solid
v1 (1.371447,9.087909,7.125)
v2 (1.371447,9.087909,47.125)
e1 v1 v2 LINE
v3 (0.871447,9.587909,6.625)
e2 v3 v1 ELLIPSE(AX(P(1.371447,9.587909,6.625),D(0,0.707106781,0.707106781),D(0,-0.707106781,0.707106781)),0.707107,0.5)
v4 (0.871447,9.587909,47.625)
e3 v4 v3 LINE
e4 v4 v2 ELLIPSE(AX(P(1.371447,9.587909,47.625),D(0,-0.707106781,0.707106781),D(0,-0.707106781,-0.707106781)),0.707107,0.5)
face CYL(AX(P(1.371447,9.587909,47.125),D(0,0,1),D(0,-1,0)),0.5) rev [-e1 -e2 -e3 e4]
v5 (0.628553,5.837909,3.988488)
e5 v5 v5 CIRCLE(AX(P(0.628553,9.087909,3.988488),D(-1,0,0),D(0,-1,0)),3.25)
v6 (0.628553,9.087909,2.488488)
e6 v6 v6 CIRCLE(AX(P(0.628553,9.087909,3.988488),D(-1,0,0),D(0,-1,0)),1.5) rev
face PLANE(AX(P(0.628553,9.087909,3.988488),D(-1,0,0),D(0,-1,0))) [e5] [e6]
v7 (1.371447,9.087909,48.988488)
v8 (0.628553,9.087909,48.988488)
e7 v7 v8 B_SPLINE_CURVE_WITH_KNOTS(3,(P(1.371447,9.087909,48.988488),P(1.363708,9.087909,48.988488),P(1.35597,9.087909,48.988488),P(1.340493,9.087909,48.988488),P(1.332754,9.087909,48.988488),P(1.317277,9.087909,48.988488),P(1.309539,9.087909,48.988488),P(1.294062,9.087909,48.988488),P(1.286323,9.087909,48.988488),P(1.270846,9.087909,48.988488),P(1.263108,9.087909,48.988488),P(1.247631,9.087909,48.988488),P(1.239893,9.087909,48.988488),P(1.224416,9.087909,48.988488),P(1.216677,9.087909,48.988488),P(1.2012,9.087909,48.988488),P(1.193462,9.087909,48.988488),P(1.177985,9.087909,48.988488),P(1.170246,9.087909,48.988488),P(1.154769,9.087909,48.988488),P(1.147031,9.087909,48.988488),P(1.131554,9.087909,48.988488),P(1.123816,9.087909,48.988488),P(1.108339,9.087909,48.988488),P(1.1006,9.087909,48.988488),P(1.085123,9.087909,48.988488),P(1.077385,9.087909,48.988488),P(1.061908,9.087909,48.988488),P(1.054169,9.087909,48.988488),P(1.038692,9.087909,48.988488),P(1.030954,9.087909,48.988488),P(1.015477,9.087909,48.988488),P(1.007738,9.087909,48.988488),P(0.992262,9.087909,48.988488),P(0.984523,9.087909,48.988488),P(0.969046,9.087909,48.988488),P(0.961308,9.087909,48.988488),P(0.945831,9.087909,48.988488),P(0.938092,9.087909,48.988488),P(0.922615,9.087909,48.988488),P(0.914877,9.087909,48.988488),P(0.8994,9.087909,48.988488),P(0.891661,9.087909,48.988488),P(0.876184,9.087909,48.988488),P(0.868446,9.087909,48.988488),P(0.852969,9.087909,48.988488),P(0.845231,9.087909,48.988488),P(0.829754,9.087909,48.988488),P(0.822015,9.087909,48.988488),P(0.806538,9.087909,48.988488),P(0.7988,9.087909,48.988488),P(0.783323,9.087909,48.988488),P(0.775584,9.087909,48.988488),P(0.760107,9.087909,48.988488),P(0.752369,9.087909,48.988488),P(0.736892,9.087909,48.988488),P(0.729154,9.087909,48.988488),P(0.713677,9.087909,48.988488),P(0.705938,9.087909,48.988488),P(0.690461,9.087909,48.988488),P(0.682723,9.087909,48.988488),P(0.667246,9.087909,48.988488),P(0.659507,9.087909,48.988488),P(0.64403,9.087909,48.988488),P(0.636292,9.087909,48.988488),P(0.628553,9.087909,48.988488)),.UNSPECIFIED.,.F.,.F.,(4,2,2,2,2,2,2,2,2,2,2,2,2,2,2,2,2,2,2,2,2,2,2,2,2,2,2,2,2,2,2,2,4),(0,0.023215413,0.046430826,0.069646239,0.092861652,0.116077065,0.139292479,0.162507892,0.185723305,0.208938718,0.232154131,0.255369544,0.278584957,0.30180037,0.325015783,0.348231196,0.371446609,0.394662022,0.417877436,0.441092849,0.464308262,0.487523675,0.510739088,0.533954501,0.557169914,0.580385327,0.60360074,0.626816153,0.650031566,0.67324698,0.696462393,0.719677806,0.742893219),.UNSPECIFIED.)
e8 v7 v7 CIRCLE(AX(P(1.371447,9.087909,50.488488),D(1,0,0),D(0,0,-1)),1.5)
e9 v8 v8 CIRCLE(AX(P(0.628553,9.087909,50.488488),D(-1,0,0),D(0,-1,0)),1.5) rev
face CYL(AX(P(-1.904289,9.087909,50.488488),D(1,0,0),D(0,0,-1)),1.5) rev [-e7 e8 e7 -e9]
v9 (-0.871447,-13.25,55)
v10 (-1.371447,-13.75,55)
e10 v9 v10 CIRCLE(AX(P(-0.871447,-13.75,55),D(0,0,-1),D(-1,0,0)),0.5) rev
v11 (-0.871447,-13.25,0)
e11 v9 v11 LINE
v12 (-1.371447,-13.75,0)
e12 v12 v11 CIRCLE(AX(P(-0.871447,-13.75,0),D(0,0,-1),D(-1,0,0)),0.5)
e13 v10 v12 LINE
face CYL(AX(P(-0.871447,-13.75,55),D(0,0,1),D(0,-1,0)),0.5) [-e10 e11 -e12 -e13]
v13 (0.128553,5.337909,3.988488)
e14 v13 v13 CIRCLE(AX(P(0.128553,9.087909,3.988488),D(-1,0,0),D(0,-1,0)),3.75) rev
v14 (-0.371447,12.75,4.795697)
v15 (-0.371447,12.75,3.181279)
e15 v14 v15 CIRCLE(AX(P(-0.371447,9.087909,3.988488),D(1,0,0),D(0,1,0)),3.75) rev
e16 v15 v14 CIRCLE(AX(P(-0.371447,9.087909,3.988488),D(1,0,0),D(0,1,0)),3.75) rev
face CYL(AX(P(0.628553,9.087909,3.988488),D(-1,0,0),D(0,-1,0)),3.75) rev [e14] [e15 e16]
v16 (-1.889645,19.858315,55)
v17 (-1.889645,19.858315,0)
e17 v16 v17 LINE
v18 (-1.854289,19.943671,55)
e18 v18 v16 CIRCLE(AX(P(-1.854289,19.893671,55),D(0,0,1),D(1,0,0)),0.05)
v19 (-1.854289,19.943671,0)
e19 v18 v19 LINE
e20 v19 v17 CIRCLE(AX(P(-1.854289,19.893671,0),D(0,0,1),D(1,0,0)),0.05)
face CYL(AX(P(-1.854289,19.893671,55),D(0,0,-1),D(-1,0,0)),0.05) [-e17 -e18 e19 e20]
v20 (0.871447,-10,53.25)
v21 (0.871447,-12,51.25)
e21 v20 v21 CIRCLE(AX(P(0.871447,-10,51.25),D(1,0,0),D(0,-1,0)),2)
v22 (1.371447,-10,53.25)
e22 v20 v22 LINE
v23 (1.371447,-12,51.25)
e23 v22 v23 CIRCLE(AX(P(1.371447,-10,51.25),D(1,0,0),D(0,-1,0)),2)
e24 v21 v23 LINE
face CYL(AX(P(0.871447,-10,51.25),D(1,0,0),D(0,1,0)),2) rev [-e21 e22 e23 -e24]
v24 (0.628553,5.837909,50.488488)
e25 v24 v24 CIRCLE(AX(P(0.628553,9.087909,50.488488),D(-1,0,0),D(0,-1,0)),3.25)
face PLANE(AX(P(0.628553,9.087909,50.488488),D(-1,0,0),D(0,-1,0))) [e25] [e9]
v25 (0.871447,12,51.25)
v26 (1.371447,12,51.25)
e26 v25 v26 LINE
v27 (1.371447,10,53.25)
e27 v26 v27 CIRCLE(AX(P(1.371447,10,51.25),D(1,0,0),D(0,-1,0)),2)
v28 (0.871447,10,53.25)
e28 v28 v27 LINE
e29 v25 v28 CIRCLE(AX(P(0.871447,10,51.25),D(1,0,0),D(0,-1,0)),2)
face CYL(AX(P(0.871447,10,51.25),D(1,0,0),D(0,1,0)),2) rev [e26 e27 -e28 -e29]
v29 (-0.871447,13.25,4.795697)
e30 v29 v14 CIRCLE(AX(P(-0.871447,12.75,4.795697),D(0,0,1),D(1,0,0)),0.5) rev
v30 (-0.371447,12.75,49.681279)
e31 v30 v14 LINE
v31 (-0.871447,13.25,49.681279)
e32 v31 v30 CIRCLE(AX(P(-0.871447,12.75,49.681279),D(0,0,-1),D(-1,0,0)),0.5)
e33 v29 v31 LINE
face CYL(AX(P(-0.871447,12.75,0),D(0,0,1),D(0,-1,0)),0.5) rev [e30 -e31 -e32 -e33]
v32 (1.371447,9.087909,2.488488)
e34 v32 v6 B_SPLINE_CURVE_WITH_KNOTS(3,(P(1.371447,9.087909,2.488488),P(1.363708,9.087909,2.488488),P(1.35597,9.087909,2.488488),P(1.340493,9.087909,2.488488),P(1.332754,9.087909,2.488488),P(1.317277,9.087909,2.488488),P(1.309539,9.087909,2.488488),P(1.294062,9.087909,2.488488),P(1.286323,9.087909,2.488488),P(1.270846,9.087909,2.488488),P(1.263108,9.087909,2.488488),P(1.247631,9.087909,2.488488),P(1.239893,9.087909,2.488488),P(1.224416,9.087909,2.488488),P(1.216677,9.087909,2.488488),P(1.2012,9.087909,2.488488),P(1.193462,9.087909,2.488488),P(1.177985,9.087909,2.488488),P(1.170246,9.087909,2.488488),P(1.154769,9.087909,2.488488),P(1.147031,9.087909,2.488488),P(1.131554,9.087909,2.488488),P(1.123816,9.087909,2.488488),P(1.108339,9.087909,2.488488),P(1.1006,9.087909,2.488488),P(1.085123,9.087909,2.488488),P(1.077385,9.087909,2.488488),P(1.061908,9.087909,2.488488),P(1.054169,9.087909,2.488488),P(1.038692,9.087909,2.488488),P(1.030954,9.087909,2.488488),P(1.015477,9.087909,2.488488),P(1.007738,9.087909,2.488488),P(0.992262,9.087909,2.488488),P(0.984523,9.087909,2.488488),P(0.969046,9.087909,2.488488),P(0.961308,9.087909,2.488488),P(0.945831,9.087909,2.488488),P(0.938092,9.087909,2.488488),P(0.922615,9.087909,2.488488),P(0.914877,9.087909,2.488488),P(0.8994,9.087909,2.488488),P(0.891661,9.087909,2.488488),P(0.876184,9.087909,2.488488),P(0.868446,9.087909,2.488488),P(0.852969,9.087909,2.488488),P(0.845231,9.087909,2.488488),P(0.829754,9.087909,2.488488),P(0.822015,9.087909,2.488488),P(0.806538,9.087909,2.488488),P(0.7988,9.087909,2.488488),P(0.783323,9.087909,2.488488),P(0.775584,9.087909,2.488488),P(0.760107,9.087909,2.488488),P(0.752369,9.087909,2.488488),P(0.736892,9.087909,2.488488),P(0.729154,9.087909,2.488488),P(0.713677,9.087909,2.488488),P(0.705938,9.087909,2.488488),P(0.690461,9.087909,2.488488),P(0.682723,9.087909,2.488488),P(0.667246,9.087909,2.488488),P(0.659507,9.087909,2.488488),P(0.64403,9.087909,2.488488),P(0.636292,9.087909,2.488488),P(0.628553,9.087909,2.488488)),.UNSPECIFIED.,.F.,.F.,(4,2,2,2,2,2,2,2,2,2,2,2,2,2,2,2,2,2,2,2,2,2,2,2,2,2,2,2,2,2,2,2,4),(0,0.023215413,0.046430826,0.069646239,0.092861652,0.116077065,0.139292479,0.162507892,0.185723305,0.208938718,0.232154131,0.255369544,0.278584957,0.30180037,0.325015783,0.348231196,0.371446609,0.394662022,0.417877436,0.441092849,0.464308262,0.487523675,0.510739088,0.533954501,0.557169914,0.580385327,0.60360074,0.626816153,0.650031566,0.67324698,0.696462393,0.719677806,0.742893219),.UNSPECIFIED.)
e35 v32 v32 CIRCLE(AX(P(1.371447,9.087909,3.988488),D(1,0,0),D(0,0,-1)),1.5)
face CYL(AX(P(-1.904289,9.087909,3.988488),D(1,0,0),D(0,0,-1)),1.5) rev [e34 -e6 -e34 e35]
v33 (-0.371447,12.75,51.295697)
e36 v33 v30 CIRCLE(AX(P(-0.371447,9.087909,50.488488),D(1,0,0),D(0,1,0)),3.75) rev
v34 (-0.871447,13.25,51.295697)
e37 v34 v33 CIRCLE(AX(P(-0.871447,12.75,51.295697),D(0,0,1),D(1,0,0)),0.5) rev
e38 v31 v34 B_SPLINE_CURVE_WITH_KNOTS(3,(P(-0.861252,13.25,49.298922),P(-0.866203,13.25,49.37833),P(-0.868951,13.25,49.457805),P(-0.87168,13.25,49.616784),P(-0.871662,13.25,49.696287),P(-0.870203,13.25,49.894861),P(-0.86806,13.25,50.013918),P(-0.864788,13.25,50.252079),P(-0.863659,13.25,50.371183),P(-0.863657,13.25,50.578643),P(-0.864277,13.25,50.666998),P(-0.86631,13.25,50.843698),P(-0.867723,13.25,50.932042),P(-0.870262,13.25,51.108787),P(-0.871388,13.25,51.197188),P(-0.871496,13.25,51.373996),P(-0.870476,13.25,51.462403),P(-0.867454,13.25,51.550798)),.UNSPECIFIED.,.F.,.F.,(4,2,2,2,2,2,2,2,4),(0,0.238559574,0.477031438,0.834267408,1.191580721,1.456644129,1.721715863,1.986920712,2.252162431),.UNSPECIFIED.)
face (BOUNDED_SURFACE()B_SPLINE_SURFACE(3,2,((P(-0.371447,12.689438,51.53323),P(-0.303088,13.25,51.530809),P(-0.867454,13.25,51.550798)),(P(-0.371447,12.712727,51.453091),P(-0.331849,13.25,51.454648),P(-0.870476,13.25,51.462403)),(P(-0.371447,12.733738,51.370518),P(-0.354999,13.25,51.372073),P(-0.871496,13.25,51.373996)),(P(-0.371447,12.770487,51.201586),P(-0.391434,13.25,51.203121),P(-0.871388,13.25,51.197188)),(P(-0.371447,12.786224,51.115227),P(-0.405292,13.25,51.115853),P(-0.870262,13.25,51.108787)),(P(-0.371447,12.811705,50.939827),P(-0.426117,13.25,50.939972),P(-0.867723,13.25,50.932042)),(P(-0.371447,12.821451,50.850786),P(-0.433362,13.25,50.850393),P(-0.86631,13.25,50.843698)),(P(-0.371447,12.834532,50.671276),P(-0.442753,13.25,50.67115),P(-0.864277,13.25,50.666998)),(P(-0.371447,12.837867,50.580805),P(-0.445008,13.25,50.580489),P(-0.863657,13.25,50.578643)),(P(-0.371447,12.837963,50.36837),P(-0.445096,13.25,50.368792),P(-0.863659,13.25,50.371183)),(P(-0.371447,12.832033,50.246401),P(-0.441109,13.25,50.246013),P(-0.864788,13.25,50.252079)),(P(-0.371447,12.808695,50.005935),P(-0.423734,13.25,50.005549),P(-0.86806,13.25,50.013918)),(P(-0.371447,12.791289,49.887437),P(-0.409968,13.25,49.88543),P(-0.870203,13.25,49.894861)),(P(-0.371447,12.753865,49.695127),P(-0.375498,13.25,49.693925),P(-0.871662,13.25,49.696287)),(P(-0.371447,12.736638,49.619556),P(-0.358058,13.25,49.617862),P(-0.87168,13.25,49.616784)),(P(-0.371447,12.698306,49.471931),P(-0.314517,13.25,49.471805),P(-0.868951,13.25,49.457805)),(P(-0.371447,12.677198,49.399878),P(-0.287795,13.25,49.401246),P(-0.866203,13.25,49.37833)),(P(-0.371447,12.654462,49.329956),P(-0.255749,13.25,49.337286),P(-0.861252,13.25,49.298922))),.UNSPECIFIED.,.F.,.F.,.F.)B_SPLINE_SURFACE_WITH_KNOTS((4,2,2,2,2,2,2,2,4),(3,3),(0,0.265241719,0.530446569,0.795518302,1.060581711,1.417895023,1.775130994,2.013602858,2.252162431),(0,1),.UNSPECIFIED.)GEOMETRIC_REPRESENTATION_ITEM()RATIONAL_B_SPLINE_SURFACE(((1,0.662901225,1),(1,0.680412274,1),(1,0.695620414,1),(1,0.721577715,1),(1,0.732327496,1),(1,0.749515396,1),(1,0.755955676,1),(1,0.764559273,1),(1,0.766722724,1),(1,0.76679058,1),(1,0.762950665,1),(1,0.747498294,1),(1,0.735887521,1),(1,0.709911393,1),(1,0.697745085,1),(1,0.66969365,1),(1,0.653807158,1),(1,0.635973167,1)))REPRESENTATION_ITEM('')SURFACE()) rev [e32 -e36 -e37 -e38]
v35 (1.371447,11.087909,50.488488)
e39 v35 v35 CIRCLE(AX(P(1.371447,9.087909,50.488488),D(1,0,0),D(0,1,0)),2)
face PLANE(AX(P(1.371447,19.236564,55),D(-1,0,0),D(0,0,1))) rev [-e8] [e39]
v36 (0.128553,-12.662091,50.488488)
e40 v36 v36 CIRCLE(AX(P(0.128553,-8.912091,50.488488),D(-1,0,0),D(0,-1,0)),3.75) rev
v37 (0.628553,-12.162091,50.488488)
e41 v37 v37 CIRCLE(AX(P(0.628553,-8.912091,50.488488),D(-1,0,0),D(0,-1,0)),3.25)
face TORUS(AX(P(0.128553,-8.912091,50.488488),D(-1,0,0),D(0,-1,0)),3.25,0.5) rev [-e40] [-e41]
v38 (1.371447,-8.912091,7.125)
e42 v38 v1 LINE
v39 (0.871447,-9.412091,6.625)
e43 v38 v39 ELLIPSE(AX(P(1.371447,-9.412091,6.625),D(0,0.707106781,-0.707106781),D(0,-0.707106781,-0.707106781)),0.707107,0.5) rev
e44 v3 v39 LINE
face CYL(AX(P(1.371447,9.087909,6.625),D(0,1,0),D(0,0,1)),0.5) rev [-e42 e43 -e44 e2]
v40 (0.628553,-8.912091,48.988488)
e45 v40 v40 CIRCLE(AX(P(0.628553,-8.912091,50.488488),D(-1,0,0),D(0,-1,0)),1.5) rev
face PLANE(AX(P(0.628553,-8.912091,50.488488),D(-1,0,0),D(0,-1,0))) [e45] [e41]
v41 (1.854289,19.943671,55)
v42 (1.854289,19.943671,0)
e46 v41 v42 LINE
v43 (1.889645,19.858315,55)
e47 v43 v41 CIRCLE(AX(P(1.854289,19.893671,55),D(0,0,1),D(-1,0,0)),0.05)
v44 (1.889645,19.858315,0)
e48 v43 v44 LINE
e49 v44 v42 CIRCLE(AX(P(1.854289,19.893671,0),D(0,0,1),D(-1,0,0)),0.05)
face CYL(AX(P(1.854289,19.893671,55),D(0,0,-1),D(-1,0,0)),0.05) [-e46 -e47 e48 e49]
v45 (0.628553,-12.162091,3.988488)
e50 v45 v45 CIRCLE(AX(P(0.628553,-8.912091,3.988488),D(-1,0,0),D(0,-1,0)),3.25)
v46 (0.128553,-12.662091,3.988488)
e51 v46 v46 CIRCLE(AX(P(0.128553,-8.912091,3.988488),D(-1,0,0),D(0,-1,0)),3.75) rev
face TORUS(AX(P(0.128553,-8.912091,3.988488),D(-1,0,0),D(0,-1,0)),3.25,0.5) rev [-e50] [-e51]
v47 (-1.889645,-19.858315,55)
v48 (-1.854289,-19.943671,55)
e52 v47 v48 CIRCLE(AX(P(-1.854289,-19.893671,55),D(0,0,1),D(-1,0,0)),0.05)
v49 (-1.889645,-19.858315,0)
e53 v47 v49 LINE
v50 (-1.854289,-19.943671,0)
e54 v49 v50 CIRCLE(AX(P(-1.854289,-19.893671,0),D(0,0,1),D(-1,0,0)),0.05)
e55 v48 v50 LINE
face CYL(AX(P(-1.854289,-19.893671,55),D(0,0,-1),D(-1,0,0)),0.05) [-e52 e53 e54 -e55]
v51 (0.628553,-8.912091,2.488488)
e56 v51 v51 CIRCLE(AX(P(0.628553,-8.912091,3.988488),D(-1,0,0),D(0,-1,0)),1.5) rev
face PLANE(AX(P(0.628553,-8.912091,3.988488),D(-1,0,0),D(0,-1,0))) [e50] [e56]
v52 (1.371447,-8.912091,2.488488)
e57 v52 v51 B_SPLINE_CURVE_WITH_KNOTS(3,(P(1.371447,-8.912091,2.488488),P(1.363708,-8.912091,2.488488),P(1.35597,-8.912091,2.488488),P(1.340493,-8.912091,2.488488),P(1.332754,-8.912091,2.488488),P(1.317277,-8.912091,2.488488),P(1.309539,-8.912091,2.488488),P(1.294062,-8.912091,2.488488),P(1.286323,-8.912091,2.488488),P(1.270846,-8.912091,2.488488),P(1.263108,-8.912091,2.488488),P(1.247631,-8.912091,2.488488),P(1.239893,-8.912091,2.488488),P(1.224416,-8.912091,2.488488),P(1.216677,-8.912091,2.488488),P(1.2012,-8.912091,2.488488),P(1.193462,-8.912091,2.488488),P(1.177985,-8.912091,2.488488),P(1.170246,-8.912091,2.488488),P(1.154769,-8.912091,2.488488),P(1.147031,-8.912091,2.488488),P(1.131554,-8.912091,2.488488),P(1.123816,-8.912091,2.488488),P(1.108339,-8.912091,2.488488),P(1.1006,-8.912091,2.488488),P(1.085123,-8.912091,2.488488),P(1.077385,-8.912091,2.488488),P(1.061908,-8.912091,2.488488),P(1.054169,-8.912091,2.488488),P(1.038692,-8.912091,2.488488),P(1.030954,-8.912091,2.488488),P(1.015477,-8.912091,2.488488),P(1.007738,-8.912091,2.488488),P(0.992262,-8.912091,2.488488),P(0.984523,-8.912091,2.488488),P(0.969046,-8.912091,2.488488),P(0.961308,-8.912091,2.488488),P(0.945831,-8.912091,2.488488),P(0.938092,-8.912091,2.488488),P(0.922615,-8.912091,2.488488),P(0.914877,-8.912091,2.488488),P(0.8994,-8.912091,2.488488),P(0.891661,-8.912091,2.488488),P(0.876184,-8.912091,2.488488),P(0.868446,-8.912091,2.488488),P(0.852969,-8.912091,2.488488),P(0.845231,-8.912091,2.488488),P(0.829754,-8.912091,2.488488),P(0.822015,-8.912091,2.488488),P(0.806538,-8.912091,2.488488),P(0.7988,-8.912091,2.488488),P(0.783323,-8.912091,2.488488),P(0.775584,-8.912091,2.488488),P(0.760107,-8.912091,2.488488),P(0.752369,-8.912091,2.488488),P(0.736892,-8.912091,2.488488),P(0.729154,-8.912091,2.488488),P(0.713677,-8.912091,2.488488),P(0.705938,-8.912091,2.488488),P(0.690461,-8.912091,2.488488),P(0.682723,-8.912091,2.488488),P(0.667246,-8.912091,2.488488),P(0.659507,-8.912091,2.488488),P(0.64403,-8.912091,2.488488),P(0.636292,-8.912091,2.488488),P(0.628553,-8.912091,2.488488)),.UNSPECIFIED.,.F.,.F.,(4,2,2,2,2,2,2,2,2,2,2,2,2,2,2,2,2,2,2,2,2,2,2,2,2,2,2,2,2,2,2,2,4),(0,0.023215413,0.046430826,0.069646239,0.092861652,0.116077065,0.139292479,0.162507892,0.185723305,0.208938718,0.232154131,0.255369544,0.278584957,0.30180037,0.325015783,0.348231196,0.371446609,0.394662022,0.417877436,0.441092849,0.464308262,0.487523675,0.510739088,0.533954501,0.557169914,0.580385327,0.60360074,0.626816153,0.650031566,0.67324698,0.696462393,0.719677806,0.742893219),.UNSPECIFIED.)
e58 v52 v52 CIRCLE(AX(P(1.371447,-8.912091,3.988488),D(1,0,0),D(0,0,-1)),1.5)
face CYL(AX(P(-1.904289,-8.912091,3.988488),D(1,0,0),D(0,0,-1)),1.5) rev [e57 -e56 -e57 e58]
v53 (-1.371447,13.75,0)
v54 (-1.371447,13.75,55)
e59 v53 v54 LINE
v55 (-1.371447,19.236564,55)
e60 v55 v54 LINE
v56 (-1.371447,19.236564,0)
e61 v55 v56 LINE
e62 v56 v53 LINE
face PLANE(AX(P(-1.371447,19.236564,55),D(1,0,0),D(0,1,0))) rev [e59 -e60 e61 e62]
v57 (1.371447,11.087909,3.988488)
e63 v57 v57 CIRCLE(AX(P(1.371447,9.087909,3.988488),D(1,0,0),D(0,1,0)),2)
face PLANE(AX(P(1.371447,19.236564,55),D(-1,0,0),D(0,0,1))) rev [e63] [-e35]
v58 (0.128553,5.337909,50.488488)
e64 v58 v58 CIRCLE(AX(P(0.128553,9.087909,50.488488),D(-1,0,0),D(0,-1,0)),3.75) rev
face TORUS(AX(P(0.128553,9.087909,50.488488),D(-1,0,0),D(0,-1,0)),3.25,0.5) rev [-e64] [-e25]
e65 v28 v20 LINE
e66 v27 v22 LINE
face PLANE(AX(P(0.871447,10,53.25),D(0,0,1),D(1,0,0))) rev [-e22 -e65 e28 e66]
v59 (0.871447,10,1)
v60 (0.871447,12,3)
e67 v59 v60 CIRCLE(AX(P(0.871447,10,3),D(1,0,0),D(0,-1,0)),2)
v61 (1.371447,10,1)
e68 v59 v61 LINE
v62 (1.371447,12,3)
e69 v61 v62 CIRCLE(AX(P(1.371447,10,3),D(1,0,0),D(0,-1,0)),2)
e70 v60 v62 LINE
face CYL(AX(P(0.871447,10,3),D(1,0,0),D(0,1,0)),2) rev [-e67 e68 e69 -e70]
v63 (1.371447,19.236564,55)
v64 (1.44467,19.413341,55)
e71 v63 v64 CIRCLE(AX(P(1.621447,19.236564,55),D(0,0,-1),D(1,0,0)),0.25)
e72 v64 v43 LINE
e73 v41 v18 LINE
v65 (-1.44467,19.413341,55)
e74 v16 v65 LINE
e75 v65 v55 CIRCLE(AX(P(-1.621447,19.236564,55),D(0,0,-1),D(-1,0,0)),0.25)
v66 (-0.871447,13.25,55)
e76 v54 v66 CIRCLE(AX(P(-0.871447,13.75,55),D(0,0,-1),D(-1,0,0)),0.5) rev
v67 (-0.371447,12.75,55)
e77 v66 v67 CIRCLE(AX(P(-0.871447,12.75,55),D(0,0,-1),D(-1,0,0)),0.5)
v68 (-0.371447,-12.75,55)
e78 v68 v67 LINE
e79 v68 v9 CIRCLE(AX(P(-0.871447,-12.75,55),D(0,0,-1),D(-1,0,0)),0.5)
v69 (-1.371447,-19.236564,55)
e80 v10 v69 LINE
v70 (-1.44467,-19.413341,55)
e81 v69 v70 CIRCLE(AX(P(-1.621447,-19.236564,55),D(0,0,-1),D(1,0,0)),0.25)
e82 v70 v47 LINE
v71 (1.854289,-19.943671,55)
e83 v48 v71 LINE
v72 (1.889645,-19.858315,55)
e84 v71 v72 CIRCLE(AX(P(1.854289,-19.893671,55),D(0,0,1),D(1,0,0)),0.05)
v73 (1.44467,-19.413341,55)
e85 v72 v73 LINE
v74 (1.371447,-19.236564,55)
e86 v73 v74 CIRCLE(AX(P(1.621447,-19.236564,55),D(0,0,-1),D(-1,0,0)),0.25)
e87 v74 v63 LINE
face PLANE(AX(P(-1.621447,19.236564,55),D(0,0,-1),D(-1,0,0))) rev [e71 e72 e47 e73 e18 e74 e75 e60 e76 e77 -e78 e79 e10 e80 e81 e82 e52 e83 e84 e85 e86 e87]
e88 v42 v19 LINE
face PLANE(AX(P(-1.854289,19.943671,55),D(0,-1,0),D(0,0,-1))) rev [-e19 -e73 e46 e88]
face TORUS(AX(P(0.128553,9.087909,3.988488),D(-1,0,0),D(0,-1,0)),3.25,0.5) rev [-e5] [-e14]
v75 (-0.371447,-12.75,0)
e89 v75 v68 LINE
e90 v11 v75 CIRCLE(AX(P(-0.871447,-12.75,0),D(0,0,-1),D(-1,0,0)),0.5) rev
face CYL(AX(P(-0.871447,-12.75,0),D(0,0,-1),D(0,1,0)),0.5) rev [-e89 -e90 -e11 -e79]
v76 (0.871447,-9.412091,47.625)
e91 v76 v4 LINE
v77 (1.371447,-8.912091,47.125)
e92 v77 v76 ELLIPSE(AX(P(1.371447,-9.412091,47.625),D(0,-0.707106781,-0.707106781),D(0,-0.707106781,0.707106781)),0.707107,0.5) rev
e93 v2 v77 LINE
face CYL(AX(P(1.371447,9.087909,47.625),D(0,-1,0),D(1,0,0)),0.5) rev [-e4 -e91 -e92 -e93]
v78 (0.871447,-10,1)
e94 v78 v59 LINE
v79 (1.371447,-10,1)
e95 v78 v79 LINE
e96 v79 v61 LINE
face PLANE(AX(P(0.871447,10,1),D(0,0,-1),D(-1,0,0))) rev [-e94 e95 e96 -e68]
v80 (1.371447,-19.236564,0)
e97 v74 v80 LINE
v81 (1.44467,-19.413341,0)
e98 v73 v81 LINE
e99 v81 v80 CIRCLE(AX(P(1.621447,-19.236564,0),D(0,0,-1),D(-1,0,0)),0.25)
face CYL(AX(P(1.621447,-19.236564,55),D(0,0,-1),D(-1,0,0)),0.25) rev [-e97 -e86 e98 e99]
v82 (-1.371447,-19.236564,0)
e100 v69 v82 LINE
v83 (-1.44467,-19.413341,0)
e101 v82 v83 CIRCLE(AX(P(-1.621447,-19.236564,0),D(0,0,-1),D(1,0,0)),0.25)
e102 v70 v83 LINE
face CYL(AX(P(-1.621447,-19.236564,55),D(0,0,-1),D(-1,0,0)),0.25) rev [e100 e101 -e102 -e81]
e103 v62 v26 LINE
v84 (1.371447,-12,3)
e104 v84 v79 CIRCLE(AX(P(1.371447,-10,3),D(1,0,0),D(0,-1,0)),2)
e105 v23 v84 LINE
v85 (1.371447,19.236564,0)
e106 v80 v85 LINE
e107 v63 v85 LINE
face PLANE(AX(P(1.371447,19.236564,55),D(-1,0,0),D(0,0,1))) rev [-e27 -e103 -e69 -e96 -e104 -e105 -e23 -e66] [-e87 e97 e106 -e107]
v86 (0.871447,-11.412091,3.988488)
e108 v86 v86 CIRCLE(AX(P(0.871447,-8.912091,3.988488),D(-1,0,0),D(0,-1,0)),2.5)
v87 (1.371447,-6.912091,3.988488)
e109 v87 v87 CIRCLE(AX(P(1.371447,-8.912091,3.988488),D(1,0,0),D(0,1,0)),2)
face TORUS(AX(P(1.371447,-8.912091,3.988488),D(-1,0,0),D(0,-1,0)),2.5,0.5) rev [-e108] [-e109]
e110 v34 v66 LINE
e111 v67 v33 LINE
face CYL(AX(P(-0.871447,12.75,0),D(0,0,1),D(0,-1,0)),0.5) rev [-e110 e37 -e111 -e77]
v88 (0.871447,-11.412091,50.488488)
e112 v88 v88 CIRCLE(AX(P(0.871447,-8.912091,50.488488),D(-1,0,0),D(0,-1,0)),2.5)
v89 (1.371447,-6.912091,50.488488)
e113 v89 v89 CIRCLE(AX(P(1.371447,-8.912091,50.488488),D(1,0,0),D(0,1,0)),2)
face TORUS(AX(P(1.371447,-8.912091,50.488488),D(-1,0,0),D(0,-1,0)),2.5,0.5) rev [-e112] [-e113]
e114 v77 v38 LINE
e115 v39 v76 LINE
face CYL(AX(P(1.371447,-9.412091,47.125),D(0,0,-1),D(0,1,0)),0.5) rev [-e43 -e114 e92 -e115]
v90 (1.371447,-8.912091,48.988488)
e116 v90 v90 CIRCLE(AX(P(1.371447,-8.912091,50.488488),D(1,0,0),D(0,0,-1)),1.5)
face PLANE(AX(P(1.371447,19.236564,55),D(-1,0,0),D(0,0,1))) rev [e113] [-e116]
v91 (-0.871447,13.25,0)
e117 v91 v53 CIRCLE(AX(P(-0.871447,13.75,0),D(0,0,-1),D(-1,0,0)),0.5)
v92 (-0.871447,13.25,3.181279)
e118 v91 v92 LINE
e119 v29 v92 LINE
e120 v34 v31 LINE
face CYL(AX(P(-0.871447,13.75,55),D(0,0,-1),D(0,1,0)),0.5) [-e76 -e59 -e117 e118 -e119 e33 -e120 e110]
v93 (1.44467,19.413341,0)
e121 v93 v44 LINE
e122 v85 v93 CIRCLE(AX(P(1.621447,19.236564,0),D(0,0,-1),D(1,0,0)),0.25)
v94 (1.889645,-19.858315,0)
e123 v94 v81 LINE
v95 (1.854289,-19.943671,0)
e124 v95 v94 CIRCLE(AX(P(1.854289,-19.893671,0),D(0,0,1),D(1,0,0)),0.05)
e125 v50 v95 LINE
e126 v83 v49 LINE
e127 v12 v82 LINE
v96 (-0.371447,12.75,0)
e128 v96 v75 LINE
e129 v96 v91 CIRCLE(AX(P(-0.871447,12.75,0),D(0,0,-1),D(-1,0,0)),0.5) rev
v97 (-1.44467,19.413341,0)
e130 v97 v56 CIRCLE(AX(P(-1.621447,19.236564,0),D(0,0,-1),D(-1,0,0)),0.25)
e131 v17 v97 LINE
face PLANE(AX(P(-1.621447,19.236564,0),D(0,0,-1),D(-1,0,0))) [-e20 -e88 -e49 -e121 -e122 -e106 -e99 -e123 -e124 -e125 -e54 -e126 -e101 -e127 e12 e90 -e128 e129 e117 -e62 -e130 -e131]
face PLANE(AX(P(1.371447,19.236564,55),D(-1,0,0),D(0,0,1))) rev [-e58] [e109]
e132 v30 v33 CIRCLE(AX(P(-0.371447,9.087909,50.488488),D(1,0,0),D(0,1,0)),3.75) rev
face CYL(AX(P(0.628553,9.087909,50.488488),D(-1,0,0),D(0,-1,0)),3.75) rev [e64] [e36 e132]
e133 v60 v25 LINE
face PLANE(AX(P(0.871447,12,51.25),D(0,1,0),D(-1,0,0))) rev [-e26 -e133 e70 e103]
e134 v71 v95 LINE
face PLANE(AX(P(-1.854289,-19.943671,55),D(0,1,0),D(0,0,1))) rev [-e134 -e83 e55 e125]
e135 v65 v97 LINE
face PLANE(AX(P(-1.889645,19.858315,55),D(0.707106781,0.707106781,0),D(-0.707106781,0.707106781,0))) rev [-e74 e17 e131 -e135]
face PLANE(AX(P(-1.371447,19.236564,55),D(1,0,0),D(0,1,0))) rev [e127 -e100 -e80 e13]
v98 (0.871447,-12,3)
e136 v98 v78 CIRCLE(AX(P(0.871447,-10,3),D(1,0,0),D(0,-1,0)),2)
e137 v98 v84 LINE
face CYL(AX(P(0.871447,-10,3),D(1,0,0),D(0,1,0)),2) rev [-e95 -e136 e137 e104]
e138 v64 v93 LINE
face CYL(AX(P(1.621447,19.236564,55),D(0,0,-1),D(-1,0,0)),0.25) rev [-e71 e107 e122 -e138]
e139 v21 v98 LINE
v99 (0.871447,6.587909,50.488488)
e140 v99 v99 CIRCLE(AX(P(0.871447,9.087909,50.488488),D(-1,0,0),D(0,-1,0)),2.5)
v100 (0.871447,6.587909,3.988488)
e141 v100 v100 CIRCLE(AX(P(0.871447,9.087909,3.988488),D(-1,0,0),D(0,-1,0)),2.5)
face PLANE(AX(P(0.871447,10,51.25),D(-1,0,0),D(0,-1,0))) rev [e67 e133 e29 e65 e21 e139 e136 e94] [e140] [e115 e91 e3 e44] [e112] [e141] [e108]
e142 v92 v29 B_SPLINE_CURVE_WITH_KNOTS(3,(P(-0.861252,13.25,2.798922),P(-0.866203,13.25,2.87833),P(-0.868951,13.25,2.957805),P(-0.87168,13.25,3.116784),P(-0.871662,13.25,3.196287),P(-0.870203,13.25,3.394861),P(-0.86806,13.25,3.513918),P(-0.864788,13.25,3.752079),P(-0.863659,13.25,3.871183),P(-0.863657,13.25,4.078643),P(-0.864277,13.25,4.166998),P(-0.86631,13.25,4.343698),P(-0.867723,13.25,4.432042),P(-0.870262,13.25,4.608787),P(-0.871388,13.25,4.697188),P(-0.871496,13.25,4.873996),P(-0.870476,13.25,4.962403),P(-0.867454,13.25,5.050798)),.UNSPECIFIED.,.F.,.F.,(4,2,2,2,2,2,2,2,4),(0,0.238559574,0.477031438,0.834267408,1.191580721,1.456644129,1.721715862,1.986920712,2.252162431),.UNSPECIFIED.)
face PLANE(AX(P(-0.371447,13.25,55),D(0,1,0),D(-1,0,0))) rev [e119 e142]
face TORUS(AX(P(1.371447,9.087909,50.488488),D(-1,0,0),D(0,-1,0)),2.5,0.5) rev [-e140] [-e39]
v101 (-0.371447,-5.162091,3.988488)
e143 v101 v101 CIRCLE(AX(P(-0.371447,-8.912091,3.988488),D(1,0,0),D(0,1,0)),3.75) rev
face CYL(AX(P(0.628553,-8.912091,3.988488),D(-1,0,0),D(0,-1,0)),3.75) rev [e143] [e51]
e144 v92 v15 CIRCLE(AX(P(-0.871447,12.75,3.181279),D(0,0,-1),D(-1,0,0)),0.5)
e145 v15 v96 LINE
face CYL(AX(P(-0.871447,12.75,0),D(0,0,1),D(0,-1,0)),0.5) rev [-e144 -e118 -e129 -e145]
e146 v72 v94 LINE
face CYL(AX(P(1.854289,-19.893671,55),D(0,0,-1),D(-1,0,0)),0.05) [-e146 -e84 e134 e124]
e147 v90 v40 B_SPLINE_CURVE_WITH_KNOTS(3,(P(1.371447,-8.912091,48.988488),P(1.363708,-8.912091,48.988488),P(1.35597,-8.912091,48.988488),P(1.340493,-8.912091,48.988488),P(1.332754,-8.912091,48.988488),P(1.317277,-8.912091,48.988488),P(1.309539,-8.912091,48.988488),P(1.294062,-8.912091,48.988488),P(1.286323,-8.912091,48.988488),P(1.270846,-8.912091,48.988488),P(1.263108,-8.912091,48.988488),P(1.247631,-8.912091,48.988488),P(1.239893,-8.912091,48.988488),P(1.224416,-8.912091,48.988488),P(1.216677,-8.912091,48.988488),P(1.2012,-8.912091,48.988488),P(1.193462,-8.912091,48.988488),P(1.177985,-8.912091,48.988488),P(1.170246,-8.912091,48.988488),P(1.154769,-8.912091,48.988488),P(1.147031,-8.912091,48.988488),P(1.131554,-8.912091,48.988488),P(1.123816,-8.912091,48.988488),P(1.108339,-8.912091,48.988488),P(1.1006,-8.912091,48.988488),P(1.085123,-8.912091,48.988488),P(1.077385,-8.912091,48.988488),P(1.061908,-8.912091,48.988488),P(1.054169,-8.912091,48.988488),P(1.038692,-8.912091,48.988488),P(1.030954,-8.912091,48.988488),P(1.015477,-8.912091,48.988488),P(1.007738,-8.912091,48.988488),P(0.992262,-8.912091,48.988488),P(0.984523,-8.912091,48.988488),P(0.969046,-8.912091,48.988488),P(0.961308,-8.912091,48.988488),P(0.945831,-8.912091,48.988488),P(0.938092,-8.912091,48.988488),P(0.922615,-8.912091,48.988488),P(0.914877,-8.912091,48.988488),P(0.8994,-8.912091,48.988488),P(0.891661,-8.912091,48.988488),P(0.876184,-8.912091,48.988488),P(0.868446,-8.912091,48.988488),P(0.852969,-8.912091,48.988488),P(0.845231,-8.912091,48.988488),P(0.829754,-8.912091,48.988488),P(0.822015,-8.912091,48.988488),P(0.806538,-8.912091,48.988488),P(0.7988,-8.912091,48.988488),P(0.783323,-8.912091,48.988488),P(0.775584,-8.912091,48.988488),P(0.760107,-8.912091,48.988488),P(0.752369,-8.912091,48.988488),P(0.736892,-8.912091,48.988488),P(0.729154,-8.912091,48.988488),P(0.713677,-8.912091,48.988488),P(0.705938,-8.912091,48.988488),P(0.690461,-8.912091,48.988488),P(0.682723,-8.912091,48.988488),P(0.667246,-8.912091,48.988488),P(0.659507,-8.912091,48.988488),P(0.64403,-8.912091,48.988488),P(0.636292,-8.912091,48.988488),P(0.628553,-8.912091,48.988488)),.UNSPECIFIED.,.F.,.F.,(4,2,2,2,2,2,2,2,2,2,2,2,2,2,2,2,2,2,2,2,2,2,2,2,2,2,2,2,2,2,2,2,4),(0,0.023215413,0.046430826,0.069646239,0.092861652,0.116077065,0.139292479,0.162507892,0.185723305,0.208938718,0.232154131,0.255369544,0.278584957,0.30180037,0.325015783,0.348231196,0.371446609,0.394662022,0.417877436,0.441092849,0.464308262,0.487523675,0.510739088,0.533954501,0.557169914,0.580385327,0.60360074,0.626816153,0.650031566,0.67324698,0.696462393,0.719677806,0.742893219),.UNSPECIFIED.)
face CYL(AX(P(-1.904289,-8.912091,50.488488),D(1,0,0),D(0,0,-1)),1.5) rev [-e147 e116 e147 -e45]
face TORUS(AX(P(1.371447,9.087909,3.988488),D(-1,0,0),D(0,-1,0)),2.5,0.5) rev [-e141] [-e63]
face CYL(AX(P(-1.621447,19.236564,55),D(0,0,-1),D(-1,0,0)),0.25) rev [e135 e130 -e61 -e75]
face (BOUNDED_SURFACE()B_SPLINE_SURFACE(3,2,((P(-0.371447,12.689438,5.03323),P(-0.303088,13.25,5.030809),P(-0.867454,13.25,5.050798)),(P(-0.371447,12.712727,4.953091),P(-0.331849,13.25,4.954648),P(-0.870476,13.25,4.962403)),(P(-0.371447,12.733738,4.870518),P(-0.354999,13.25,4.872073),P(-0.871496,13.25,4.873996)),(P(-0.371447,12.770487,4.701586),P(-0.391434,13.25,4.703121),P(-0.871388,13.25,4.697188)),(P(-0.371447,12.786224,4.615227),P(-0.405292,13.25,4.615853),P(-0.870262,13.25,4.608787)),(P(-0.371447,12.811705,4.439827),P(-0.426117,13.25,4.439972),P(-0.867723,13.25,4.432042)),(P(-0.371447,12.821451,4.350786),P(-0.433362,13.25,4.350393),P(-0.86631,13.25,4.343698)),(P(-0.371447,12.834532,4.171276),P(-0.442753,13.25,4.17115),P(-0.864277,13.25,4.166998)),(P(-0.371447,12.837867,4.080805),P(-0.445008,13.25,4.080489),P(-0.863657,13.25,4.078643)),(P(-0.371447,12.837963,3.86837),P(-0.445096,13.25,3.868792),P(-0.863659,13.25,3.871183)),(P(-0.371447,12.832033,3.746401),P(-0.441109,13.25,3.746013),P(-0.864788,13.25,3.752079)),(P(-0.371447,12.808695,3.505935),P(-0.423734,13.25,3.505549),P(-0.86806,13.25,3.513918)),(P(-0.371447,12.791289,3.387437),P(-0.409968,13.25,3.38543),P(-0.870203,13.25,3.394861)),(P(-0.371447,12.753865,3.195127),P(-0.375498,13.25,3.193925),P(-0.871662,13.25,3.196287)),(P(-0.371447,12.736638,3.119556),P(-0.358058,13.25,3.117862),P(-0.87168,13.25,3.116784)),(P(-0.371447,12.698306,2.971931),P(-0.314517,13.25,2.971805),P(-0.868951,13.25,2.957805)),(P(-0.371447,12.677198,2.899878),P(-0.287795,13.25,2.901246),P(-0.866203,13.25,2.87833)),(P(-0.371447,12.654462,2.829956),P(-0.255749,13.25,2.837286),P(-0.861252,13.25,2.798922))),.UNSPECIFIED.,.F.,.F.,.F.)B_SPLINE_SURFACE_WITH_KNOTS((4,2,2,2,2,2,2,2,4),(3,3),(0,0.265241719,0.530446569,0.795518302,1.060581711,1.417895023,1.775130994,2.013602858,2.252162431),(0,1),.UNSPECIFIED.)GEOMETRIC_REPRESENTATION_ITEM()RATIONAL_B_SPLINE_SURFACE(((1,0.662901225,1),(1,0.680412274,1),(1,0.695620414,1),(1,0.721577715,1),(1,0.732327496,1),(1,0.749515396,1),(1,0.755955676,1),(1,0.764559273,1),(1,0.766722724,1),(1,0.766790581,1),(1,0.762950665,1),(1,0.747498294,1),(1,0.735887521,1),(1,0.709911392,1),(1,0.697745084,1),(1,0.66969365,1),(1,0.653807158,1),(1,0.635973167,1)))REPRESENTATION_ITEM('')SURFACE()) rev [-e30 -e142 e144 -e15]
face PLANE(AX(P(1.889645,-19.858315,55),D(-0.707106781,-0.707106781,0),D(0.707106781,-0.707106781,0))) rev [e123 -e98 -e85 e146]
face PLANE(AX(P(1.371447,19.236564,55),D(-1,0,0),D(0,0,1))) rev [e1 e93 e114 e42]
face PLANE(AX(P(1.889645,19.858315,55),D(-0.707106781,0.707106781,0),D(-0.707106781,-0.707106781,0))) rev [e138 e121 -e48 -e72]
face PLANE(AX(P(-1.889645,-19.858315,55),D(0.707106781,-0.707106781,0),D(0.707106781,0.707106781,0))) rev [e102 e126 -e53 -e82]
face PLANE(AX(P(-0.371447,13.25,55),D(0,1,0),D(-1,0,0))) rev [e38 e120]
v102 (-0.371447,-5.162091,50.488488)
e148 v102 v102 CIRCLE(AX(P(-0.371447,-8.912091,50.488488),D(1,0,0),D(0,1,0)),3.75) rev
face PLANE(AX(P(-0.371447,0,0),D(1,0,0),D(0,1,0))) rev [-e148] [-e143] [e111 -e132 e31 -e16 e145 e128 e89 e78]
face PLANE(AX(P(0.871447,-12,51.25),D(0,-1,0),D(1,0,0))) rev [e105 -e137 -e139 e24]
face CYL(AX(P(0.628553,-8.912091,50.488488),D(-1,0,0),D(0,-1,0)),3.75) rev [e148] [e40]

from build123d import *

# Parameters (mm, degrees)
BOSS_EXTRUDE1_DEPTH = 55
SKETCH2_R           = 2
SKETCH2_W           = 40
SKETCH2_H           = 18
CUT_EXTRUDE4_DEPTH  = 0.5
SKETCH7_R           = 1.5
CUT_EXTRUDE7_DEPTH  = 59.595908099
SKETCH8_R           = 3.75
CUT_EXTRUDE8_DEPTH  = 2
SKETCH9_W           = 55
SKETCH9_H           = 26.5
CUT_EXTRUDE9_DEPTH  = 1
FILLET1_R           = 0.5
FILLET2_R           = 0.5
FILLET3_R           = 0.5
FILLET4_R           = 0.5
FILLET5_R           = 0.5


with BuildPart() as part:
    # Sketch1 → Boss-Extrude1 (new body)
    with BuildSketch(Plane.XY):
        with BuildLine():
            Line((-1.854289322, 19.943670675), (1.854289322, 19.943670675))
            ThreePointArc((1.854289322, 19.943670675), (1.900483299, 19.912804847), (1.889644661, 19.858315336))
            Line((1.889644661, 19.858315336), (1.444669914, 19.413340589))
            ThreePointArc((1.444669914, 19.413340589), (1.390476726, 19.332234752), (1.371446609, 19.236563894))
            Line((1.371446609, 19.236563894), (1.371446609, -19.236563894))
            ThreePointArc((1.371446609, -19.236563894), (1.390476726, -19.332234752), (1.444669914, -19.413340589))
            Line((1.444669914, -19.413340589), (1.889644661, -19.858315336))
            ThreePointArc((1.889644661, -19.858315336), (1.900483299, -19.912804847), (1.854289322, -19.943670675))
            Line((1.854289322, -19.943670675), (-1.854289322, -19.943670675))
            ThreePointArc((-1.854289322, -19.943670675), (-1.900483299, -19.912804847), (-1.889644661, -19.858315336))
            Line((-1.889644661, -19.858315336), (-1.444669914, -19.413340589))
            ThreePointArc((-1.444669914, -19.413340589), (-1.390476726, -19.332234752), (-1.371446609, -19.236563894))
            Line((-1.371446609, -19.236563894), (-1.371446609, 19.236563894))
            ThreePointArc((-1.371446609, 19.236563894), (-1.390476726, 19.332234752), (-1.444669914, 19.413340589))
            Line((-1.444669914, 19.413340589), (-1.889644661, 19.858315336))
            ThreePointArc((-1.889644661, 19.858315336), (-1.900483299, 19.912804847), (-1.854289322, 19.943670675))
        make_face()
    extrude(amount=BOSS_EXTRUDE1_DEPTH)

    # Sketch2 → Cut-Extrude4 (cut)
    with BuildSketch(Plane(origin=(1.371446609, 0, 0), x_dir=(0, 0, -1), z_dir=(1, 0, 0))):
        with BuildLine():
            Line((-51.25, 12), (-3, 12))
            ThreePointArc((-3, 12), (-1.585786438, 11.414213562), (-1, 10))
            Line((-1, 10), (-1, -10))
            ThreePointArc((-1, -10), (-1.585786438, -11.414213562), (-3, -12))
            Line((-3, -12), (-51.25, -12))
            ThreePointArc((-51.25, -12), (-52.664213562, -11.414213562), (-53.25, -10))
            Line((-53.25, -10), (-53.25, 10))
            ThreePointArc((-53.25, 10), (-52.664213562, 11.414213562), (-51.25, 12))
        make_face()
        with Locations(Location((-50.488488092, 9.087908505, 0), (0, 0, 90))):
            Circle(SKETCH2_R, mode=Mode.SUBTRACT)
        with Locations(Location((-50.488488092, -8.912091495, 0), (0, 0, 90))):
            Circle(SKETCH2_R, mode=Mode.SUBTRACT)
        with Locations(Location((-3.988488092, -8.912091495, 0), (0, 0, 90))):
            Circle(SKETCH2_R, mode=Mode.SUBTRACT)
        with Locations(Location((-3.988488092, 9.087908505, 0), (0, 0, 90))):
            Circle(SKETCH2_R, mode=Mode.SUBTRACT)
        with Locations((-27.125, 0.087908505)):
            Rectangle(SKETCH2_W, SKETCH2_H, mode=Mode.SUBTRACT)
    extrude(amount=-CUT_EXTRUDE4_DEPTH, mode=Mode.SUBTRACT)

    # Sketch7 → Cut-Extrude7 (cut, through all)
    with BuildSketch(Plane(origin=(1.371446609, 0, 0), x_dir=(0, 0, -1), z_dir=(1, 0, 0))):
        with Locations((-50.488488092, 9.087908505)):
            Circle(SKETCH7_R)
        with Locations((-3.988488092, 9.087908505)):
            Circle(SKETCH7_R)
        with Locations((-3.988488092, -8.912091495)):
            Circle(SKETCH7_R)
        with Locations((-50.488488092, -8.912091495)):
            Circle(SKETCH7_R)
    extrude(amount=-CUT_EXTRUDE7_DEPTH, mode=Mode.SUBTRACT)

    # Sketch8 → Cut-Extrude8 (cut)
    with BuildSketch(Plane.ZY.offset(1.371446609)):
        with Locations(Location((3.988488092, 9.087908505, 0), (0, 0, 270))):
            Circle(SKETCH8_R)
        with Locations(Location((3.988488092, -8.912091495, 0), (0, 0, 270))):
            Circle(SKETCH8_R)
        with Locations(Location((50.488488092, 9.087908505, 0), (0, 0, 270))):
            Circle(SKETCH8_R)
        with Locations(Location((50.488488092, -8.912091495, 0), (0, 0, 270))):
            Circle(SKETCH8_R)
    extrude(amount=-CUT_EXTRUDE8_DEPTH, mode=Mode.SUBTRACT)

    # Sketch9 → Cut-Extrude9 (cut)
    with BuildSketch(Plane.ZY.offset(1.371446609)):
        with Locations((27.5, 0)):
            Rectangle(SKETCH9_W, SKETCH9_H)
    extrude(amount=-CUT_EXTRUDE9_DEPTH, mode=Mode.SUBTRACT)

    # Fillet1
    fillet1_edges = [part.edges().sort_by_distance(p)[0] for p in [
        (-0.371446609, 13.25, 27.5),
        (-0.371446609, -13.25, 27.5),
    ]]
    fillet(fillet1_edges, radius=FILLET1_R)

    # Fillet2
    fillet2_edges = [part.edges().sort_by_distance(p)[0] for p in [
        (-1.371446609, -13.25, 27.5),
        (-1.371446609, 13.25, 27.5),
    ]]
    fillet(fillet2_edges, radius=FILLET2_R - 0.0001)  # a hair under: the kernel refuses the full size

    # Fillet3
    fillet3_edges = [part.edges().sort_by_distance(p)[0] for p in [
        (0.871446609, 7.087908505, 3.988488092),
        (0.871446609, -10.912091495, 3.988488092),
        (0.871446609, -10.912091495, 50.488488092),
        (0.871446609, 7.087908505, 50.488488092),
    ]]
    fillet(fillet3_edges, radius=FILLET3_R - 0.0001)  # a hair under: the kernel refuses the full size

    # Fillet4
    fillet4_edges = [part.edges().sort_by_distance(p)[0] for p in [
        (0.871446609, 0.087908505, 7.125),
        (0.871446609, -8.912091495, 27.125),
        (0.871446609, 9.087908505, 27.125),
        (0.871446609, 0.087908505, 47.125),
    ]]
    fillet(fillet4_edges, radius=FILLET4_R - 0.0001)  # a hair under: the kernel refuses the full size

    # Fillet5
    fillet5_edges = [part.edges().sort_by_distance(p)[0] for p in [
        (0.628553391, -5.162091495, 3.988488092),
        (0.628553391, 12.837908505, 50.488488092),
        (0.628553391, -5.162091495, 50.488488092),
        (0.628553391, 12.837908505, 3.988488092),
    ]]
    fillet(fillet5_edges, radius=FILLET5_R)


solid = part.part
